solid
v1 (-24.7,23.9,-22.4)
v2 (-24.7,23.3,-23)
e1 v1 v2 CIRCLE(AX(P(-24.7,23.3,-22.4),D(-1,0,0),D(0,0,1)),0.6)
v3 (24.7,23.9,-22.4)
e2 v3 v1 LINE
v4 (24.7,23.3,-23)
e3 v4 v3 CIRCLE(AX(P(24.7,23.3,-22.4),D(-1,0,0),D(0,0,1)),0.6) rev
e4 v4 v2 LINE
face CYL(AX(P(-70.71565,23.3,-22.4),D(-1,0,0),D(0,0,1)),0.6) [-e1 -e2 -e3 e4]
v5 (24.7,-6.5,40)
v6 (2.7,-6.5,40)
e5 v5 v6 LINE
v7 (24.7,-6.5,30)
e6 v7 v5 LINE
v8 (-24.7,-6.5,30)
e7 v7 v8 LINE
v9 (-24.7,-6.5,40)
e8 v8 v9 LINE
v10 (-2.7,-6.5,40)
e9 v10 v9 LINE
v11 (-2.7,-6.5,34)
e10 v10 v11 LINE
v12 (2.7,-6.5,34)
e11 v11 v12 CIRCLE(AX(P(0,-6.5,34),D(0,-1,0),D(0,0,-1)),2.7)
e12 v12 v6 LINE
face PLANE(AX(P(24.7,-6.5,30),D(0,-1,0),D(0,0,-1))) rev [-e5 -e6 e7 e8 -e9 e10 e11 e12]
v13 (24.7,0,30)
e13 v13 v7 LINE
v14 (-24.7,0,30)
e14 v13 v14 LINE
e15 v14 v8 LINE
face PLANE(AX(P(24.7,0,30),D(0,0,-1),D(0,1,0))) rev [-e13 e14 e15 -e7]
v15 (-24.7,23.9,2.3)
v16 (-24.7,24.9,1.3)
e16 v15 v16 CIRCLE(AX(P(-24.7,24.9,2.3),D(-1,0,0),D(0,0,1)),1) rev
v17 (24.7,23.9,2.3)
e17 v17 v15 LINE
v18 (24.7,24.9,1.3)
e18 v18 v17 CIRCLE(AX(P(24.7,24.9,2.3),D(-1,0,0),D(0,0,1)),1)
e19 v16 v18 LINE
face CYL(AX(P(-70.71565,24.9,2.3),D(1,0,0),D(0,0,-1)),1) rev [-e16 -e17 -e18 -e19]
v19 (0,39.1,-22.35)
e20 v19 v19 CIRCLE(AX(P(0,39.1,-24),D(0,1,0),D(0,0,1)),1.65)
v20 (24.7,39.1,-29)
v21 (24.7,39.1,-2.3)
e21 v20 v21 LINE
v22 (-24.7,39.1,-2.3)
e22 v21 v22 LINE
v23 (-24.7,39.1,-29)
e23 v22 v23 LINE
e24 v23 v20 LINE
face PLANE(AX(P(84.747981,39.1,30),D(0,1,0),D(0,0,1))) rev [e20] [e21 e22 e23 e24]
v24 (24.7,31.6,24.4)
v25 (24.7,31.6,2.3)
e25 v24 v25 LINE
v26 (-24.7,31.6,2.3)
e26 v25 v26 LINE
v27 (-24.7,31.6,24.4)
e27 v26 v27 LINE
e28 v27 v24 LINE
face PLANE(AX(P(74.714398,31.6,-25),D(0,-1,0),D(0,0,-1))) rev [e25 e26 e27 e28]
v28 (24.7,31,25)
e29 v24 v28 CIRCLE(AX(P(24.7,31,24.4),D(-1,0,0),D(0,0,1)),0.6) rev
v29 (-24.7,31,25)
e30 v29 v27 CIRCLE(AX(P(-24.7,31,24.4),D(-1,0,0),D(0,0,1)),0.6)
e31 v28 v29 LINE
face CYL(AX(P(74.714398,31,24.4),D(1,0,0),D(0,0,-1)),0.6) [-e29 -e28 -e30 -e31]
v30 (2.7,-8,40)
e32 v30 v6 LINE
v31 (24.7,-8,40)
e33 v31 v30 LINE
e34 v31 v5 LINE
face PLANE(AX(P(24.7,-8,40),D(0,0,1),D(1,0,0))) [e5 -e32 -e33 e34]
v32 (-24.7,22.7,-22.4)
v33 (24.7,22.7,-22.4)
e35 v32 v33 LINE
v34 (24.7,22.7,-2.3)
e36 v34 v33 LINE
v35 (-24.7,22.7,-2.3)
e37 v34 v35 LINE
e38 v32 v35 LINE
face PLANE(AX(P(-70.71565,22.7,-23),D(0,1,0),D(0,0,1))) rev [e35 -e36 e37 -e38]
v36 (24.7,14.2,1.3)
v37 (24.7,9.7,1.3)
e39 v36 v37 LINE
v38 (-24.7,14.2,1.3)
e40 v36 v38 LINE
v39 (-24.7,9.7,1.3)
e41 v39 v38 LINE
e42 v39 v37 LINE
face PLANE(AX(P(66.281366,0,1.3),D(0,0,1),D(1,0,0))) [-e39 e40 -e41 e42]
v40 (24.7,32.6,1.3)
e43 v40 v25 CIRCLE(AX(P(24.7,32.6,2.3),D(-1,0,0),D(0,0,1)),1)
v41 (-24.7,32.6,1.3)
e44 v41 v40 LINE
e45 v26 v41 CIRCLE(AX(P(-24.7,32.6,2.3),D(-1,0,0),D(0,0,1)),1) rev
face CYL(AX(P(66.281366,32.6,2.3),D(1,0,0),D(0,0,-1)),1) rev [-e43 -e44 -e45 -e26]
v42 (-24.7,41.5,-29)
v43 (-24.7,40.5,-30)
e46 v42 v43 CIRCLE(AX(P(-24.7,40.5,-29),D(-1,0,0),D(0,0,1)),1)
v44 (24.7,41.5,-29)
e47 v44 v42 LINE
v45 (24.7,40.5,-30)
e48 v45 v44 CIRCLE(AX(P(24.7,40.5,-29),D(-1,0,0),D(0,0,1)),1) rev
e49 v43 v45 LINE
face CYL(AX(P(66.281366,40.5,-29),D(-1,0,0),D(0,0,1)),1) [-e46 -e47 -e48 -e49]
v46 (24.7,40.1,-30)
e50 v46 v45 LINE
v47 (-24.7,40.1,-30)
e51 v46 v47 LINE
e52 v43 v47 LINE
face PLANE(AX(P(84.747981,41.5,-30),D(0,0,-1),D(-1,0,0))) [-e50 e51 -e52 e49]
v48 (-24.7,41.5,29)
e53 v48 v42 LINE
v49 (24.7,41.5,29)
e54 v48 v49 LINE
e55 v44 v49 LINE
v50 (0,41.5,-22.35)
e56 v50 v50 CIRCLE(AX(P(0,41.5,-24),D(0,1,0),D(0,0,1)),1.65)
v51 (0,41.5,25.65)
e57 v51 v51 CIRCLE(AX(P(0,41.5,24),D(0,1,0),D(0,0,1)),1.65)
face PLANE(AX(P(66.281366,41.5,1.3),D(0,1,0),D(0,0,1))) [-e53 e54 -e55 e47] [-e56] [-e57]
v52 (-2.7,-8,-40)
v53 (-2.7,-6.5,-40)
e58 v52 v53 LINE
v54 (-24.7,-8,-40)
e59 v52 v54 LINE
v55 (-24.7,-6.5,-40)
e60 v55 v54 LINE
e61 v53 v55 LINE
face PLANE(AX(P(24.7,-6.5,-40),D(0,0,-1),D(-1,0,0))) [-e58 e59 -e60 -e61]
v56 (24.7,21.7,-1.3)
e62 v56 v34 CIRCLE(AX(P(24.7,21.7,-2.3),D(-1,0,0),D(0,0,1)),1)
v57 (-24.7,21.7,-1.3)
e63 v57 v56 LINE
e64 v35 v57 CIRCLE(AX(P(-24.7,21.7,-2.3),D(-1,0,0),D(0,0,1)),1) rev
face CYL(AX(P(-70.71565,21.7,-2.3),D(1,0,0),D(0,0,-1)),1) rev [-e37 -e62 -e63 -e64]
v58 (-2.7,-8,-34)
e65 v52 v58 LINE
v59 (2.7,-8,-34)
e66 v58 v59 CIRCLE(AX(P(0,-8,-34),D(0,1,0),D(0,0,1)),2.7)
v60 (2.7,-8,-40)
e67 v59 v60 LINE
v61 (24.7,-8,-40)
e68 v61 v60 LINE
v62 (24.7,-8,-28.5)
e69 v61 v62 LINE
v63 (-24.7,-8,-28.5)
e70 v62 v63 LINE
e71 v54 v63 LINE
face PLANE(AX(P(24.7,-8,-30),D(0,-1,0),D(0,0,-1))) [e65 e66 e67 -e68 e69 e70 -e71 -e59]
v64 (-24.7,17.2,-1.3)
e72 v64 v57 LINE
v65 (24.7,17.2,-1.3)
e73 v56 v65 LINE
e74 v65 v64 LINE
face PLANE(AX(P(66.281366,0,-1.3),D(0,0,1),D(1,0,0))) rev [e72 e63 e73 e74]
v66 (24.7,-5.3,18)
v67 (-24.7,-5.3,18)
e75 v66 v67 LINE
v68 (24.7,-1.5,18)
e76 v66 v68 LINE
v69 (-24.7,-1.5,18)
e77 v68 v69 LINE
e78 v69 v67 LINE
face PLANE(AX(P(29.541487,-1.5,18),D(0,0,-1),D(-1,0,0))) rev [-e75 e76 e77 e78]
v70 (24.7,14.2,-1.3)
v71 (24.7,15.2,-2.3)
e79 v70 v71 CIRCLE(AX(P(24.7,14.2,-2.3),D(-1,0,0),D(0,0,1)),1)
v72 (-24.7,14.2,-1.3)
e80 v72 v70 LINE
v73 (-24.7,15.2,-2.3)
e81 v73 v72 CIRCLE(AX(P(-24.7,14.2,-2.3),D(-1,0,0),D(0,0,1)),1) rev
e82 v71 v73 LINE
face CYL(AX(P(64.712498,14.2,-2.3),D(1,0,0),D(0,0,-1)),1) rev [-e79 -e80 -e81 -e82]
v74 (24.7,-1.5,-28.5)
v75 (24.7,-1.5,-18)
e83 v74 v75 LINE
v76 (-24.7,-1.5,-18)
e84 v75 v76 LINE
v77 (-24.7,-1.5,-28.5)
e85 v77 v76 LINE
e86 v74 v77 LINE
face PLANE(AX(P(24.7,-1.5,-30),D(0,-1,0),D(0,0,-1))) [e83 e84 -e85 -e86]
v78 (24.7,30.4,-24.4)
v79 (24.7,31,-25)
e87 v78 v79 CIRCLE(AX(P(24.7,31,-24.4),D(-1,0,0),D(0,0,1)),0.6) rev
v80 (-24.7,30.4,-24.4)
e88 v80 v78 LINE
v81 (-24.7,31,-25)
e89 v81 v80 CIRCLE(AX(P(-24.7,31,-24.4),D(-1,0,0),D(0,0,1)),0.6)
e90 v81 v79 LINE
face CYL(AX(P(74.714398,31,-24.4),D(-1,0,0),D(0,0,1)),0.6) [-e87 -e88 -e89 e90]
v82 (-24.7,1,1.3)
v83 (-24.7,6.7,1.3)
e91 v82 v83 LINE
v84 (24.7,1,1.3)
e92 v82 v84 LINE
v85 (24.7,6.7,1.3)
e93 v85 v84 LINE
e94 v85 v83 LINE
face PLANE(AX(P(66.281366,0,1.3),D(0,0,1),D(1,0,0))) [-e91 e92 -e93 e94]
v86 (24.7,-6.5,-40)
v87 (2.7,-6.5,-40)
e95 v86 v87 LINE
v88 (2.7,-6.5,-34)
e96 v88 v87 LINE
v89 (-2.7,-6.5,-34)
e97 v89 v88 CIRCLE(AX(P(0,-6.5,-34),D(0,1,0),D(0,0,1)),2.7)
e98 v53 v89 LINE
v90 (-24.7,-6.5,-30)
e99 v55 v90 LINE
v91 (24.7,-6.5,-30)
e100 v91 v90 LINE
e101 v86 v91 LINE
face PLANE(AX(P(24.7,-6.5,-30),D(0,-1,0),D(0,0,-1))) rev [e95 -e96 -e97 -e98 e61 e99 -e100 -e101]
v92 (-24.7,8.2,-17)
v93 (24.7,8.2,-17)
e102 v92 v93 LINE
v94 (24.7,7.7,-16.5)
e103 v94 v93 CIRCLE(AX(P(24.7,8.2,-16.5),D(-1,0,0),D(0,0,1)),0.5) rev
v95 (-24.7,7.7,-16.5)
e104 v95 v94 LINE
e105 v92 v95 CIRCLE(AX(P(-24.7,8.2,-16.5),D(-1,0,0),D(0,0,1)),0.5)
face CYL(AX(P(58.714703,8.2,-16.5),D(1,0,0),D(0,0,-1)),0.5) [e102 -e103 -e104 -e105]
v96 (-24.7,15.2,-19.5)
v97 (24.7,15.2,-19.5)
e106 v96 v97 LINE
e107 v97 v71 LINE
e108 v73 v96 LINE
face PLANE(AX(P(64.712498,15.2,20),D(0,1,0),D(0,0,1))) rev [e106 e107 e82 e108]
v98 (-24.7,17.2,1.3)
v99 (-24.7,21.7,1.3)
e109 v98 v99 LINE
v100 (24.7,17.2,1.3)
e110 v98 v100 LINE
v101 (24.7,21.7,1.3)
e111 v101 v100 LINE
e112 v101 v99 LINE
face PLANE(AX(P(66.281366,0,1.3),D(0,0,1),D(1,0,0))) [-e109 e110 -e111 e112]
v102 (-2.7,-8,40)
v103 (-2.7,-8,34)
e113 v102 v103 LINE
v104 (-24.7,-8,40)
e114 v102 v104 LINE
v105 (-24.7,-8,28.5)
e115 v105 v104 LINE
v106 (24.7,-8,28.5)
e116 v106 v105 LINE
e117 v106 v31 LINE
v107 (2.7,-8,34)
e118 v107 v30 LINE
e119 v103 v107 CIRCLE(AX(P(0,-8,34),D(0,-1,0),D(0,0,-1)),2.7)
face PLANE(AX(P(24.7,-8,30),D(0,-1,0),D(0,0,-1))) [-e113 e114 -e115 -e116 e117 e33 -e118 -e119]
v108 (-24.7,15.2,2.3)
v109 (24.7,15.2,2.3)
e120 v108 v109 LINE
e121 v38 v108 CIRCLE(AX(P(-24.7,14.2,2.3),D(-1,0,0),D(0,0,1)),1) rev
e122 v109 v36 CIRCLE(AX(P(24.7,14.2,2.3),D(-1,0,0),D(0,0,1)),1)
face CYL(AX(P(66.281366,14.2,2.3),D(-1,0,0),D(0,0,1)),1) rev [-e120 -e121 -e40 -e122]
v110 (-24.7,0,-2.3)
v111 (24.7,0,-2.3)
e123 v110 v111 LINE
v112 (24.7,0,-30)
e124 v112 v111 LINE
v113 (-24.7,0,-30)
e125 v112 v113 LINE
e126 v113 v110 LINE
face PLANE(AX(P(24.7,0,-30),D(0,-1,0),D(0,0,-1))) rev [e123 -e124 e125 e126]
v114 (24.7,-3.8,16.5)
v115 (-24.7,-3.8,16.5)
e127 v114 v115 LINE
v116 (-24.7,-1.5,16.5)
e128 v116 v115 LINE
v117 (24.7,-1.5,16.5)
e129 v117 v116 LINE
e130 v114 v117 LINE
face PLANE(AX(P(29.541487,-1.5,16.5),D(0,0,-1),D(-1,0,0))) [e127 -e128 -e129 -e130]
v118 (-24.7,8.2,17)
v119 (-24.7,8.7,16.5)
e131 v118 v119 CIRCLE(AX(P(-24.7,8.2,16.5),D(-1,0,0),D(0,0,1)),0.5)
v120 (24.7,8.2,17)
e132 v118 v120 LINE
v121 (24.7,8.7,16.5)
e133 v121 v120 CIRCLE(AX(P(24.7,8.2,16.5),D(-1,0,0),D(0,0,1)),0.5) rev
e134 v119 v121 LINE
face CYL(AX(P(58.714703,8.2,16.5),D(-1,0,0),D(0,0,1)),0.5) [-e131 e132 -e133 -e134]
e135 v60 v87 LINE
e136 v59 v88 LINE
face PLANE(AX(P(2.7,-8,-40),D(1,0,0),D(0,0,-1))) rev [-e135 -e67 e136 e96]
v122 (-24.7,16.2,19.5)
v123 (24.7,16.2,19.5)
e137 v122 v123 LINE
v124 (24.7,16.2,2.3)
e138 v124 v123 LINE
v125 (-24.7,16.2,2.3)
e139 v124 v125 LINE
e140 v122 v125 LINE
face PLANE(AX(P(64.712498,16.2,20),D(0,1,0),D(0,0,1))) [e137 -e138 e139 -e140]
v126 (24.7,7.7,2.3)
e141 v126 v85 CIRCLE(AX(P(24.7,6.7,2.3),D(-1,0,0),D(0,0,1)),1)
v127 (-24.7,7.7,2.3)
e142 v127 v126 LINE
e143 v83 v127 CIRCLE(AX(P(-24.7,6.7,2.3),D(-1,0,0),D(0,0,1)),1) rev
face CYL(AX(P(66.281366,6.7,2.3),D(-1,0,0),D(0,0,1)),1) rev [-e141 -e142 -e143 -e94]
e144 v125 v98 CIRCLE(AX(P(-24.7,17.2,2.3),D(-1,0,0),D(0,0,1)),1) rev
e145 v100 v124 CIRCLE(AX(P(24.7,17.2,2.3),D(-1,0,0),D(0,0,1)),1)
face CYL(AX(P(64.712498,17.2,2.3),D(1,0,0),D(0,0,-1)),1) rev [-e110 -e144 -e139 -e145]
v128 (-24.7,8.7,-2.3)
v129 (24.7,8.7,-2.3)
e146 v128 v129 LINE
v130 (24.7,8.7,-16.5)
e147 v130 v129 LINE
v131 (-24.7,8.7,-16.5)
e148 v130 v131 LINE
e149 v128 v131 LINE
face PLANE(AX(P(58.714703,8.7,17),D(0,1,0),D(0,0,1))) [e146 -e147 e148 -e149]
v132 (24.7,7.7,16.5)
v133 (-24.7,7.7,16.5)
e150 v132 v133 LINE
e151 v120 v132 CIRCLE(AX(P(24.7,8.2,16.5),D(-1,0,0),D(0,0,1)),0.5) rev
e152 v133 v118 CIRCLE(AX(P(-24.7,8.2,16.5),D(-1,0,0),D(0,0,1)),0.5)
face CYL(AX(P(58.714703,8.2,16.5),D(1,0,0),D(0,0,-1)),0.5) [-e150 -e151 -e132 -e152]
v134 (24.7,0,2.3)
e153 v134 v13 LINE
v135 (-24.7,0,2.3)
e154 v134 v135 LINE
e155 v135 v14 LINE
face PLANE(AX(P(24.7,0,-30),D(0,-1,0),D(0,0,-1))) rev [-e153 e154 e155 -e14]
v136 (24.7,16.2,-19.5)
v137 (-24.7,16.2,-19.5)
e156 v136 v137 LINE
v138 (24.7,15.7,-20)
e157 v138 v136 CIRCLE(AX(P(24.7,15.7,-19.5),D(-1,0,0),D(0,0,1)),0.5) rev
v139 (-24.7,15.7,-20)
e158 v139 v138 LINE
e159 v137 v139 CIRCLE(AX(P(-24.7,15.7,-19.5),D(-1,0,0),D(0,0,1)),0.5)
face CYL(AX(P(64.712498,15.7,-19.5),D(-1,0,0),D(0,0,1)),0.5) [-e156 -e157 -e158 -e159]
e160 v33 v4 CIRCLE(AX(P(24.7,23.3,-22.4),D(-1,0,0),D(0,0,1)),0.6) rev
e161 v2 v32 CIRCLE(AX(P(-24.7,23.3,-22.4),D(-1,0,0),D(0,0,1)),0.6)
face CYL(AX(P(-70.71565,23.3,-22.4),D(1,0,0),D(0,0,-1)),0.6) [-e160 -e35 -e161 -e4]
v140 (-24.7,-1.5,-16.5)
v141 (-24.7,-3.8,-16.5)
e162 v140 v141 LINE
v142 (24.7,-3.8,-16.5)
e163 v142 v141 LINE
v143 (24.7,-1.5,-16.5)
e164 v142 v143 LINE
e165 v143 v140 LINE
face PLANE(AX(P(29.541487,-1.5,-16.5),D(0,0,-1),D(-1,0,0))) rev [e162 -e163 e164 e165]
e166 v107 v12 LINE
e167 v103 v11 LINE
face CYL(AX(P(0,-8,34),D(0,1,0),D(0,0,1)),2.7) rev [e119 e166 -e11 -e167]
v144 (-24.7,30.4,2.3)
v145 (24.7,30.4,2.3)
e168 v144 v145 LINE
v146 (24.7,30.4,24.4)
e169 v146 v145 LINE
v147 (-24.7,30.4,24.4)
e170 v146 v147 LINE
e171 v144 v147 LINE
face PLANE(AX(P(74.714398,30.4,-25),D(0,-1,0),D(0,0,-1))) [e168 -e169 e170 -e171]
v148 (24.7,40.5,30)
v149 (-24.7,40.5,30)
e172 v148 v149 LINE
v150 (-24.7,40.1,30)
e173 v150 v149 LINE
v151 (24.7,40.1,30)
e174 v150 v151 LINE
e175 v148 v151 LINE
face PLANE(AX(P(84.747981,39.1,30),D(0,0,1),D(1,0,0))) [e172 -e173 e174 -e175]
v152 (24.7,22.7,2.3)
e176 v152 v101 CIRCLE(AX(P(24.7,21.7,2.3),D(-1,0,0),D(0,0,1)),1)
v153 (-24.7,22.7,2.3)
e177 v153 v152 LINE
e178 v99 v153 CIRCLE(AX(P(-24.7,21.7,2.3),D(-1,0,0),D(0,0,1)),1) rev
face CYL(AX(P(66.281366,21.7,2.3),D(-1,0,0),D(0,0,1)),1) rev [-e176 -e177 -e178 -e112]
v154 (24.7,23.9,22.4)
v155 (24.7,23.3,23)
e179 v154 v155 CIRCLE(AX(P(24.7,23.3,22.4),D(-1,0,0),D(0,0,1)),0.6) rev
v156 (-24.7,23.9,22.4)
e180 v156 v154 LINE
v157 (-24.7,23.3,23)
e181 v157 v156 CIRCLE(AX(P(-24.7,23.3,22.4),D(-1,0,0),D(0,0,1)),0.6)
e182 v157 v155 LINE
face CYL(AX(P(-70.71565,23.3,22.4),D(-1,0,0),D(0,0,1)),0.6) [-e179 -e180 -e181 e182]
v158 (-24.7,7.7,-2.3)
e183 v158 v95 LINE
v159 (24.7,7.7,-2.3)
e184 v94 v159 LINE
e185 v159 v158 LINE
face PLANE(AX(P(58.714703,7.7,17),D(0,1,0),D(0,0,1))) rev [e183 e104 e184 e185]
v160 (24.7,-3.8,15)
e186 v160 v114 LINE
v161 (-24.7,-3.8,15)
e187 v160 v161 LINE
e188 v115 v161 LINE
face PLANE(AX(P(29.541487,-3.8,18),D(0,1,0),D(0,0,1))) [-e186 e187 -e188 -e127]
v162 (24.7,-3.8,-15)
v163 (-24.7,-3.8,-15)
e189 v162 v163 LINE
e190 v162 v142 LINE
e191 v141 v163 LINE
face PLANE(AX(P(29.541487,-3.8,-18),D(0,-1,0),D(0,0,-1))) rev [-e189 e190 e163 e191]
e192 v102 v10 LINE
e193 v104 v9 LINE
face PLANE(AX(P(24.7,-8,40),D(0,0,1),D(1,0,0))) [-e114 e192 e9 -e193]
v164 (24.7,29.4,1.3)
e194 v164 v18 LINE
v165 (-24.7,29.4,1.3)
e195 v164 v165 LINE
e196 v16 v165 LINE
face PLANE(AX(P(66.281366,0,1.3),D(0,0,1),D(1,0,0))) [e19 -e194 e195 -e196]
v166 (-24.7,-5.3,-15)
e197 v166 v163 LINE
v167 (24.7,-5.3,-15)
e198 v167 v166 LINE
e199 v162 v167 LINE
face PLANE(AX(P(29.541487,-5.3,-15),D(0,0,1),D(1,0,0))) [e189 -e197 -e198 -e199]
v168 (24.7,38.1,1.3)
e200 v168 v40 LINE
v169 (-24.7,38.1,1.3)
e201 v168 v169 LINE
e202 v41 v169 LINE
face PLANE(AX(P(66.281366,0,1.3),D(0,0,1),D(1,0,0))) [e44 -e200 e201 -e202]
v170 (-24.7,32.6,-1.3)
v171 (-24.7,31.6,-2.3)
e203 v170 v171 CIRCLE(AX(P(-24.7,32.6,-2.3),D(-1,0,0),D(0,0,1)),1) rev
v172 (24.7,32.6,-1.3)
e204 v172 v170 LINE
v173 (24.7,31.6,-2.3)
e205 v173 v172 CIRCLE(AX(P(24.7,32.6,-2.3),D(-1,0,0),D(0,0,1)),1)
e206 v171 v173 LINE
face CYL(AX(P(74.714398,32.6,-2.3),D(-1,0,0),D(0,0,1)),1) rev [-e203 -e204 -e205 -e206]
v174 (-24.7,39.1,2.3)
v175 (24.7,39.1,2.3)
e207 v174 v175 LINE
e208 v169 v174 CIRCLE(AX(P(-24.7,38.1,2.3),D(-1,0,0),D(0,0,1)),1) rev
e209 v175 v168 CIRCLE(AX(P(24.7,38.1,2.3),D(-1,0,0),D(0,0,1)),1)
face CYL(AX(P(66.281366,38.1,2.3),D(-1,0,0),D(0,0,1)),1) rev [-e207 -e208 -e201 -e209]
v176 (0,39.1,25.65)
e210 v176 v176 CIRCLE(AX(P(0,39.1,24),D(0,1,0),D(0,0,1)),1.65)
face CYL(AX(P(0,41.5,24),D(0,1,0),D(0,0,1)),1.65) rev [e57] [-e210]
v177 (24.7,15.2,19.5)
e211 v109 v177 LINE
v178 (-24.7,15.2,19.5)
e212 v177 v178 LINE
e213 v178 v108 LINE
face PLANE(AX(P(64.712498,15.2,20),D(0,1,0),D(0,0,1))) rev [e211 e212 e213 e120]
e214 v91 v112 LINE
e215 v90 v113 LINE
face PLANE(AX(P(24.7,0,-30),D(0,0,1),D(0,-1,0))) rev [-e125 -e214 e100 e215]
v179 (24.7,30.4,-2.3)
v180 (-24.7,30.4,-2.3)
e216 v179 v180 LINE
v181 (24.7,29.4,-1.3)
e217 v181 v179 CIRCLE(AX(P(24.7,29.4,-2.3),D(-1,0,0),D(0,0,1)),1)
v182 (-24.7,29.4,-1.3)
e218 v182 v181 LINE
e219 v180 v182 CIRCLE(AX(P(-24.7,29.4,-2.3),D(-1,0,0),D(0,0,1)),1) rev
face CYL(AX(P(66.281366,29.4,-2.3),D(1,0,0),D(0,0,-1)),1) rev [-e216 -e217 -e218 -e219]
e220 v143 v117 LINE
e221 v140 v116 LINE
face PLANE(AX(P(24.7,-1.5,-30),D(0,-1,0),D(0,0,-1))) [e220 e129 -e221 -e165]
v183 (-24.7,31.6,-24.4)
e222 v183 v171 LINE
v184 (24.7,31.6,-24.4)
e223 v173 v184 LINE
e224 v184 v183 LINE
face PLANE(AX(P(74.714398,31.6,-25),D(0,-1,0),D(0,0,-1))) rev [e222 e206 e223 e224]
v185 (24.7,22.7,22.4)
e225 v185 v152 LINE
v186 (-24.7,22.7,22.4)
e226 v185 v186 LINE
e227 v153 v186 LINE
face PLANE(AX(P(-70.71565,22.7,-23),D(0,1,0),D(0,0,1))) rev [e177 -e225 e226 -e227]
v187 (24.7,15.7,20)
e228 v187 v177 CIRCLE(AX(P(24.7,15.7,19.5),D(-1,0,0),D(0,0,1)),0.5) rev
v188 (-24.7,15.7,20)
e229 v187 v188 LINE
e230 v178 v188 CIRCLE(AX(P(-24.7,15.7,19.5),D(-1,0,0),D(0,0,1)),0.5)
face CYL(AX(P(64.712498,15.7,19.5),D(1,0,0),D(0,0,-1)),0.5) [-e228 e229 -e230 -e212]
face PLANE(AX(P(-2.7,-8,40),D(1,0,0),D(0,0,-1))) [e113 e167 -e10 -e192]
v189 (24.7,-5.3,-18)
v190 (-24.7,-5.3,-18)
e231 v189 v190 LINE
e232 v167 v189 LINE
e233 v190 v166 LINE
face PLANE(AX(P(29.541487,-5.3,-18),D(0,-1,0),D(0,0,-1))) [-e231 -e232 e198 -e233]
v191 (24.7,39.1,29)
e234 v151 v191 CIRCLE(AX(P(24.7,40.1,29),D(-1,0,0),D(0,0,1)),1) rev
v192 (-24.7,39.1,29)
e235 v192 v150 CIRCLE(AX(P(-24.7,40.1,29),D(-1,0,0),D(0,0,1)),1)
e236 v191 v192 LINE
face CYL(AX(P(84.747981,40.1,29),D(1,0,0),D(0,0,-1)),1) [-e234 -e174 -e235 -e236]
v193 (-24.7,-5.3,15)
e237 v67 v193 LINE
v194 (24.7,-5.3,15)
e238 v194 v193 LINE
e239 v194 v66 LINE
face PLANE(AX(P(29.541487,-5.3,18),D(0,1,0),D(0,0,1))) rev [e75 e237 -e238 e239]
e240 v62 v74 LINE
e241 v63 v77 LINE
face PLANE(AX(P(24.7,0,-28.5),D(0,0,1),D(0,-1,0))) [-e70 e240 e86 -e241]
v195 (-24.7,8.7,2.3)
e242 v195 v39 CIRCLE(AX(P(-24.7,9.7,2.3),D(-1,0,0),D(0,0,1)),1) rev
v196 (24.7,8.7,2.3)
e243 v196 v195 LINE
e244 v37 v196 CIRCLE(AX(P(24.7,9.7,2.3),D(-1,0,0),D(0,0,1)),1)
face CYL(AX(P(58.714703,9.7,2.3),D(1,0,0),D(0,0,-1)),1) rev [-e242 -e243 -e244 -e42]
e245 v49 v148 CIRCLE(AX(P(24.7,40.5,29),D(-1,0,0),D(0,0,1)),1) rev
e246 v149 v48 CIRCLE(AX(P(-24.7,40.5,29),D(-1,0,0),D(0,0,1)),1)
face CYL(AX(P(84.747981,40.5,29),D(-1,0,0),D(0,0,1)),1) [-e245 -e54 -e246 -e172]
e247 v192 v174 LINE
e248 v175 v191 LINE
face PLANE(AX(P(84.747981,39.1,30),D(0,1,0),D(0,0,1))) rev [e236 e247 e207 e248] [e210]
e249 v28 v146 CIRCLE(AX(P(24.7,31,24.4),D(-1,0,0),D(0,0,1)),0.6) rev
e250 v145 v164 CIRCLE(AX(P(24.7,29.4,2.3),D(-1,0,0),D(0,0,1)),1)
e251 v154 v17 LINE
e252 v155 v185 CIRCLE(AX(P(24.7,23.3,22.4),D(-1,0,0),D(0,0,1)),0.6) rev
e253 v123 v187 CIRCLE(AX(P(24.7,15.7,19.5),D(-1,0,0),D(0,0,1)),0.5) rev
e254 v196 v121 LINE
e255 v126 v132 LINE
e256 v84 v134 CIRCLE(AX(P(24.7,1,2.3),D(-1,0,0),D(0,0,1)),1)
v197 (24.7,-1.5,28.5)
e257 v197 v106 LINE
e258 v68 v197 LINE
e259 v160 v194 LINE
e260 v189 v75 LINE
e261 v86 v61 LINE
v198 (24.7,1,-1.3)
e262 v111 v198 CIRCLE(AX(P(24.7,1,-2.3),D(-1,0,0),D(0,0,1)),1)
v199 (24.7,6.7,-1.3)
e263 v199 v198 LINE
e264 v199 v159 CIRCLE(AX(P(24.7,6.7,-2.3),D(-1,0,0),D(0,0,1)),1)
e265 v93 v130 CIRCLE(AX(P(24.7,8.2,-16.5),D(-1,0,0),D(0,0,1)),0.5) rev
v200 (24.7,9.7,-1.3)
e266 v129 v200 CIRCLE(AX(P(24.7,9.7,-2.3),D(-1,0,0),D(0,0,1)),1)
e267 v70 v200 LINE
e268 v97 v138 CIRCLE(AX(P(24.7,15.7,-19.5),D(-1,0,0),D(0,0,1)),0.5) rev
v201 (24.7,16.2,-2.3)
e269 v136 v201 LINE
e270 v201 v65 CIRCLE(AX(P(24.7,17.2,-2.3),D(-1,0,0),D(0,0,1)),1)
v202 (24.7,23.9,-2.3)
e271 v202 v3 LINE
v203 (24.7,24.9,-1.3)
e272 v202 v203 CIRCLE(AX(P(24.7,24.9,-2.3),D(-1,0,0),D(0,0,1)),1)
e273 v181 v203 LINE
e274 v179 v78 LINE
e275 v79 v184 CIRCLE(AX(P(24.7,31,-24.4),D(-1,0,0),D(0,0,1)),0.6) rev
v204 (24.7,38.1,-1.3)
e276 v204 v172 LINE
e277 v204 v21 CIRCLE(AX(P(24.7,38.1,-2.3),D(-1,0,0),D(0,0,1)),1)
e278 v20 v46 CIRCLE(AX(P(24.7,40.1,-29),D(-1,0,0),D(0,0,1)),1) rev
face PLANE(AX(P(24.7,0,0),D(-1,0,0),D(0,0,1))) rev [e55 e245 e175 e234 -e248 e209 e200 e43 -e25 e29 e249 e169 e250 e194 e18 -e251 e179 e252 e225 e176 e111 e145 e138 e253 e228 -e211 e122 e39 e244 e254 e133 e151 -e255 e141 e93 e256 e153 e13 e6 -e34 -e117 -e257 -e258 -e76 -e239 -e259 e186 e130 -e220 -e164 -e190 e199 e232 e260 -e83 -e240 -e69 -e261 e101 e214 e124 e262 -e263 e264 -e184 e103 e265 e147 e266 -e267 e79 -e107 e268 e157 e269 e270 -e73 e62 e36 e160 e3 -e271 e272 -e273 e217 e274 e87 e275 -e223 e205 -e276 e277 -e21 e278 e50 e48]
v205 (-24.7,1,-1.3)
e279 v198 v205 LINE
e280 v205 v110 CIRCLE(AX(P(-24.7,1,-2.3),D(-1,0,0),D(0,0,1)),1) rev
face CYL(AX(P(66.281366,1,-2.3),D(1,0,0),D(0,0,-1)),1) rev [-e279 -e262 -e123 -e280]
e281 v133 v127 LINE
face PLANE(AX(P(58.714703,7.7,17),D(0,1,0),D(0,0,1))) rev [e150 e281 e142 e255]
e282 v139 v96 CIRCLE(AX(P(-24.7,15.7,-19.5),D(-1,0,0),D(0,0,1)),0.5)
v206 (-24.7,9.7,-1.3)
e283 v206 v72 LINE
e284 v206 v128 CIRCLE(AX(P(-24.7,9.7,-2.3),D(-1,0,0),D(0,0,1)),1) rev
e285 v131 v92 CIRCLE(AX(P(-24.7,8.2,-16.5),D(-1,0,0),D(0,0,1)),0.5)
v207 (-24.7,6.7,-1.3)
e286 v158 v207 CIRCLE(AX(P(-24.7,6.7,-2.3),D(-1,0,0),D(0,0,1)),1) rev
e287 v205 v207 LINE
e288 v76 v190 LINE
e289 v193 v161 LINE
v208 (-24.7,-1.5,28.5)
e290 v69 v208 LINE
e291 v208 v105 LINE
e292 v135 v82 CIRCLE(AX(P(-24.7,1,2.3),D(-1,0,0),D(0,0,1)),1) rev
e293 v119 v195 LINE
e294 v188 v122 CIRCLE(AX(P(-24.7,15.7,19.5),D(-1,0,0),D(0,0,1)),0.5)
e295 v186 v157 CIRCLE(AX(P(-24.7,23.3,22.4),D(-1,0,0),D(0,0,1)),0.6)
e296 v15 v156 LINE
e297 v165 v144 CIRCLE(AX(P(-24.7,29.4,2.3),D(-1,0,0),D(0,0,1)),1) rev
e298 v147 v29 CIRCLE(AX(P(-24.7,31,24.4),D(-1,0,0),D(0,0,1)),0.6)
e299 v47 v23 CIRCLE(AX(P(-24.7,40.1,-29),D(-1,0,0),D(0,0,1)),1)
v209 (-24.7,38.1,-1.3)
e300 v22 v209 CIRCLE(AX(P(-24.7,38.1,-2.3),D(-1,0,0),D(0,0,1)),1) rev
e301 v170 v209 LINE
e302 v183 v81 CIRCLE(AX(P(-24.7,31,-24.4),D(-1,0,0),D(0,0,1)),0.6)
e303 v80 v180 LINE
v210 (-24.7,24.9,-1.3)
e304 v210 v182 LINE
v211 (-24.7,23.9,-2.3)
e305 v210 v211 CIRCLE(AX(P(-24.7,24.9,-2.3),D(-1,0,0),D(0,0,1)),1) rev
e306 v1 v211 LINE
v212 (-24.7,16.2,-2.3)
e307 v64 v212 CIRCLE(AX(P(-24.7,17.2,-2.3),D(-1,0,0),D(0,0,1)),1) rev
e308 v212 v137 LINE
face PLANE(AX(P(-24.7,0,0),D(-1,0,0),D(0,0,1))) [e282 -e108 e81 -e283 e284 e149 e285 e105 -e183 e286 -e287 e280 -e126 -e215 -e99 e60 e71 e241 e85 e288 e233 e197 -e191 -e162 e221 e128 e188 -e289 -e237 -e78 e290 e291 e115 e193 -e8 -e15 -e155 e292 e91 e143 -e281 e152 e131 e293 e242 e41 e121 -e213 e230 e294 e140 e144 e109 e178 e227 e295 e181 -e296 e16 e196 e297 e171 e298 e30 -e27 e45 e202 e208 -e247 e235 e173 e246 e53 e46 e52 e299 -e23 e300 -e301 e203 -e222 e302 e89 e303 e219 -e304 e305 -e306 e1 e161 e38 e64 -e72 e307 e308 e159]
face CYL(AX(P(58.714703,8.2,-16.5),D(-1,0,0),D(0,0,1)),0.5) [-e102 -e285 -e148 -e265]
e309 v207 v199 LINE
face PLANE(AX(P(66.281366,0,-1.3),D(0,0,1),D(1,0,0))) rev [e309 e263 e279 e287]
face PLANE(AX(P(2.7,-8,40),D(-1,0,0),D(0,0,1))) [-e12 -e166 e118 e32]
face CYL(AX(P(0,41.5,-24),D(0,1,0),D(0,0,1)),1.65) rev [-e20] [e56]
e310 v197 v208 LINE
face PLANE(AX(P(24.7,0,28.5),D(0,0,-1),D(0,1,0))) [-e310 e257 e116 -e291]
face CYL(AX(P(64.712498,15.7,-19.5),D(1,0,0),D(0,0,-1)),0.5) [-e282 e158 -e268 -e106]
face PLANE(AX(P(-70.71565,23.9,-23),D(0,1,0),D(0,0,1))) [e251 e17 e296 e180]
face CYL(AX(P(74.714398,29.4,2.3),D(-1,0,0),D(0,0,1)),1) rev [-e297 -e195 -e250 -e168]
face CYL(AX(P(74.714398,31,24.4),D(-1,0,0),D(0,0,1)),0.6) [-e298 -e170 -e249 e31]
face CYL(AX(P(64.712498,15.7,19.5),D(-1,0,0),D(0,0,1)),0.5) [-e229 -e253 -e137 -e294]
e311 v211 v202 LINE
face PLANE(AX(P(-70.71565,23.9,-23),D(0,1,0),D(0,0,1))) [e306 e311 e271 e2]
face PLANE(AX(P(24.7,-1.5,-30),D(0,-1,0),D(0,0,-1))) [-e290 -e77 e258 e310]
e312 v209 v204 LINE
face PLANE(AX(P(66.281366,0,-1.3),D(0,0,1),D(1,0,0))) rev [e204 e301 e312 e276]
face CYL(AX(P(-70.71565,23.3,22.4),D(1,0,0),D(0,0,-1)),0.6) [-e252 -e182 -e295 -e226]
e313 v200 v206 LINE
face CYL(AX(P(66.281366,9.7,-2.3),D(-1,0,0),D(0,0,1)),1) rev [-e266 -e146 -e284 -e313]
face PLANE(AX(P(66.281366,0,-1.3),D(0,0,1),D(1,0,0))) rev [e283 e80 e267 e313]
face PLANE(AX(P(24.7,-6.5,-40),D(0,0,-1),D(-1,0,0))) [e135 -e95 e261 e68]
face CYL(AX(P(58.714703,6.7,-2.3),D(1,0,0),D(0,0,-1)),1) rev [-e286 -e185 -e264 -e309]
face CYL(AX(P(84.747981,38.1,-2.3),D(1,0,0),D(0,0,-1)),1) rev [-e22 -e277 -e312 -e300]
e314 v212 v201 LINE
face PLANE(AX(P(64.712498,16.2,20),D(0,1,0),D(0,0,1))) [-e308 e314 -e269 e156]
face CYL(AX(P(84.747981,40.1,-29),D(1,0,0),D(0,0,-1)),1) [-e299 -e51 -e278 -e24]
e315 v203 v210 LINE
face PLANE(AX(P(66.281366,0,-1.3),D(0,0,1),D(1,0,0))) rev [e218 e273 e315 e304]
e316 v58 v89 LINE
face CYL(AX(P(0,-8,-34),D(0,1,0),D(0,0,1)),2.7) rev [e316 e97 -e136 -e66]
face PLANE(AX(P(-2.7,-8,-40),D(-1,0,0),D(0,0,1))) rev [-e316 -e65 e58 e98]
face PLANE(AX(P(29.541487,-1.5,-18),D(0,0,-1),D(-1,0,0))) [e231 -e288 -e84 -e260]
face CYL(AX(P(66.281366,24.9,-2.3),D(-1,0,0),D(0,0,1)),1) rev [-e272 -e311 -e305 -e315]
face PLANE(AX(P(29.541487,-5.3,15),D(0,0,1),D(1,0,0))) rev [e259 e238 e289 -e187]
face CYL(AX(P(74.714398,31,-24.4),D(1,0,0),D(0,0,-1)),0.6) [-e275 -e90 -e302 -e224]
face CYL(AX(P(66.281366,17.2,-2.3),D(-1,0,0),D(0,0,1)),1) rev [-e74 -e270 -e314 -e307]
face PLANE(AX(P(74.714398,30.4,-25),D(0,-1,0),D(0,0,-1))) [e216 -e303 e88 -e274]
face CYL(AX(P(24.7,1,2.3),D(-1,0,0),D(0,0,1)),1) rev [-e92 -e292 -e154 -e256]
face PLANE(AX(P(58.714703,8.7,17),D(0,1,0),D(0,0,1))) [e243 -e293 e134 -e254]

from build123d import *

# Parameters (mm, degrees)
BASE_DEPTH                 = 24.7
DINRAILLEG_START           = -24.7
DINRAILLEG_DEPTH           = 49.4
MAINRIB_START              = -24.7
MAINRIBS_W                 = 2.6
MAINRIBS_H                 = 41.5
MAINRIB_DEPTH              = 49.4
TOPBASE_START              = -24.7
TOPBASES_W                 = 60
TOPBASES_H                 = 2.4
TOPBASE_DEPTH              = 49.4
RIB1_START                 = -24.7
RIB1S_W                    = 50
RIB1S_H                    = 1.2
RIB1_DEPTH                 = 49.4
RIB2_START                 = -24.7
RIB2S_W                    = 46
RIB2S_H                    = 1.2
RIB2_DEPTH                 = 49.4
RIB3_START                 = -24.7
RIB3S_W                    = 40
RIB3S_H                    = 1
RIB3_DEPTH                 = 49.4
RIB4_START                 = -24.7
RIB4S_W                    = 34
RIB4S_H                    = 1
RIB4_DEPTH                 = 49.4
MOUNTINGSLOT_DEPTH         = 68.186977905
M4X0_7_TAPPED_HOLE1_REACH  = 70.267
M4X0_7_TAPPED_HOLE1_BORE_R = 1.65
TBF_R                      = 1
MRF_R                      = 1
FILLET_F1_R                = 0.6
FILLET_F2_R                = 0.6
FILLET_F3_R                = 0.5
FILLET_F4_R                = 0.5


with BuildPart() as part:
    # BaseS → Base (new, symmetric)
    with BuildSketch(Plane(origin=(0, 0, 0), x_dir=(0, 0, -1), z_dir=(1, 0, 0))):
        Polygon((40, -6.5), (30, -6.5), (30, 0), (-30, 0), (-30, -6.5), (-40, -6.5), (-40, -8), (-28.5, -8), (-28.5, -1.5), (28.5, -1.5), (28.5, -8), (40, -8), align=None)
    extrude(amount=BASE_DEPTH, both=True)

    # DinRailLegS → DinRailLeg (add)
    with BuildSketch(Plane(origin=(0, 0, 0), x_dir=(0, 0, -1), z_dir=(1, 0, 0)).offset(DINRAILLEG_START)):
        Polygon((18, -1.5), (18, -5.3), (15, -5.3), (15, -3.8), (16.5, -3.8), (16.5, -1.5), align=None)
    dinrailleg = extrude(amount=DINRAILLEG_DEPTH)

    # MainRibS → MainRib (add)
    with BuildSketch(Plane(origin=(0, 0, 0), x_dir=(0, 0, -1), z_dir=(1, 0, 0)).offset(MAINRIB_START)):
        with Locations((0, 20.75)):
            Rectangle(MAINRIBS_W, MAINRIBS_H)
    extrude(amount=MAINRIB_DEPTH)

    # TopBaseS → TopBase (add)
    with BuildSketch(Plane(origin=(0, 0, 0), x_dir=(0, 0, -1), z_dir=(1, 0, 0)).offset(TOPBASE_START)):
        with Locations((0, 40.3)):
            Rectangle(TOPBASES_W, TOPBASES_H)
    extrude(amount=TOPBASE_DEPTH)

    # Rib1S → Rib1 (add)
    with BuildSketch(Plane(origin=(0, 0, 0), x_dir=(0, 0, -1), z_dir=(1, 0, 0)).offset(RIB1_START)):
        with Locations((0, 31)):
            Rectangle(RIB1S_W, RIB1S_H)
    extrude(amount=RIB1_DEPTH)

    # Rib2S → Rib2 (add)
    with BuildSketch(Plane(origin=(0, 0, 0), x_dir=(0, 0, -1), z_dir=(1, 0, 0)).offset(RIB2_START)):
        with Locations((0, 23.3)):
            Rectangle(RIB2S_W, RIB2S_H)
    extrude(amount=RIB2_DEPTH)

    # Rib3S → Rib3 (add)
    with BuildSketch(Plane(origin=(0, 0, 0), x_dir=(0, 0, -1), z_dir=(1, 0, 0)).offset(RIB3_START)):
        with Locations((0, 15.7)):
            Rectangle(RIB3S_W, RIB3S_H)
    extrude(amount=RIB3_DEPTH)

    # Rib4S → Rib4 (add)
    with BuildSketch(Plane(origin=(0, 0, 0), x_dir=(0, 0, -1), z_dir=(1, 0, 0)).offset(RIB4_START)):
        with Locations((0, 8.2)):
            Rectangle(RIB4S_W, RIB4S_H)
    extrude(amount=RIB4_DEPTH)

    # MountingSlotS → MountingSlot (cut, through all)
    with BuildSketch(Plane(origin=(0, -6.5, 0), x_dir=(1, 0, 0), z_dir=(0, 1, 0))):
        with BuildLine():
            Line((2.7, 40), (2.7, 34))
            ThreePointArc((2.7, 34), (0, 31.3), (-2.7, 34))
            Line((-2.7, 34), (-2.7, 40))
            ThreePointArc((-2.7, 40), (0, 42.7), (2.7, 40))
        make_face()
    mountingslot = extrude(amount=-MOUNTINGSLOT_DEPTH, mode=Mode.SUBTRACT)

    # M4x0.7 Tapped Hole1 bore → M4x0.7 Tapped Hole1 (cut, up to next)
    with BuildSketch(Plane(origin=(0, 41.5, 0), x_dir=(1, 0, 0), z_dir=(0, 1, 0)), mode=Mode.PRIVATE) as m4x0_7_tapped_hole1_sk1:
        with Locations((0, 24)):
            Circle(M4X0_7_TAPPED_HOLE1_BORE_R)
    m4x0_7_tapped_hole1_tool1 = extrude(m4x0_7_tapped_hole1_sk1.sketch, amount=-M4X0_7_TAPPED_HOLE1_REACH, mode=Mode.PRIVATE) & part.part
    m4x0_7_tapped_hole1 = m4x0_7_tapped_hole1_tool1.solids().sort_by_distance((0, 41.5, -24))[0]
    add(m4x0_7_tapped_hole1, mode=Mode.SUBTRACT)

    # Mounting Features VM: DinRailLeg, MountingSlot, M4x0.7 Tapped Hole1 across plane
    add(dinrailleg.mirror(Plane.XY))
    add(mountingslot.mirror(Plane.XY), mode=Mode.SUBTRACT)
    add(m4x0_7_tapped_hole1.mirror(Plane.XY), mode=Mode.SUBTRACT)

    # TBF
    tbf_edges = [part.edges().sort_by_distance(p)[0] for p in [
        (0, 41.5, -30),
        (0, 39.1, 30),
        (0, 39.1, -30),
        (0, 41.5, 30),
    ]]
    fillet(tbf_edges, radius=TBF_R)

    # MRF
    mrf_edges = [part.edges().sort_by_distance(p)[0] for p in [
        (0, 23.9, -1.3),
        (0, 22.7, -1.3),
        (0, 22.7, 1.3),
        (0, 23.9, 1.3),
        (0, 15.2, -1.3),
        (0, 15.2, 1.3),
        (0, 16.2, -1.3),
        (0, 16.2, 1.3),
        (0, 7.7, -1.3),
        (0, 7.7, 1.3),
        (0, 8.7, -1.3),
        (0, 8.7, 1.3),
        (0, 0, -1.3),
        (0, 0, 1.3),
        (0, 39.1, 1.3),
        (0, 39.1, -1.3),
        (0, 31.6, -1.3),
        (0, 31.6, 1.3),
        (0, 30.4, -1.3),
        (0, 30.4, 1.3),
    ]]
    fillet(mrf_edges, radius=MRF_R)

    # Fillet F1
    fillet_f1_edges = [part.edges().sort_by_distance(p)[0] for p in [
        (0, 30.4, -25),
        (0, 31.6, -25),
        (0, 30.4, 25),
        (0, 31.6, 25),
    ]]
    fillet(fillet_f1_edges, radius=FILLET_F1_R - 0.0001)  # a hair under: the kernel refuses the full size

    # Fillet F2
    fillet_f2_edges = [part.edges().sort_by_distance(p)[0] for p in [
        (0, 23.9, -23),
        (0, 22.7, -23),
        (0, 23.9, 23),
        (0, 22.7, 23),
    ]]
    fillet(fillet_f2_edges, radius=FILLET_F2_R - 0.0001)  # a hair under: the kernel refuses the full size

    # Fillet F3
    fillet_f3_edges = [part.edges().sort_by_distance(p)[0] for p in [
        (0, 15.2, -20),
        (0, 16.2, -20),
        (0, 15.2, 20),
        (0, 16.2, 20),
    ]]
    fillet(fillet_f3_edges, radius=FILLET_F3_R - 0.0001)  # a hair under: the kernel refuses the full size

    # Fillet F4
    fillet_f4_edges = [part.edges().sort_by_distance(p)[0] for p in [
        (0, 8.7, 17),
        (0, 7.7, 17),
        (0, 7.7, -17),
        (0, 8.7, -17),
    ]]
    fillet(fillet_f4_edges, radius=FILLET_F4_R - 0.0001)  # a hair under: the kernel refuses the full size


solid = part.part
